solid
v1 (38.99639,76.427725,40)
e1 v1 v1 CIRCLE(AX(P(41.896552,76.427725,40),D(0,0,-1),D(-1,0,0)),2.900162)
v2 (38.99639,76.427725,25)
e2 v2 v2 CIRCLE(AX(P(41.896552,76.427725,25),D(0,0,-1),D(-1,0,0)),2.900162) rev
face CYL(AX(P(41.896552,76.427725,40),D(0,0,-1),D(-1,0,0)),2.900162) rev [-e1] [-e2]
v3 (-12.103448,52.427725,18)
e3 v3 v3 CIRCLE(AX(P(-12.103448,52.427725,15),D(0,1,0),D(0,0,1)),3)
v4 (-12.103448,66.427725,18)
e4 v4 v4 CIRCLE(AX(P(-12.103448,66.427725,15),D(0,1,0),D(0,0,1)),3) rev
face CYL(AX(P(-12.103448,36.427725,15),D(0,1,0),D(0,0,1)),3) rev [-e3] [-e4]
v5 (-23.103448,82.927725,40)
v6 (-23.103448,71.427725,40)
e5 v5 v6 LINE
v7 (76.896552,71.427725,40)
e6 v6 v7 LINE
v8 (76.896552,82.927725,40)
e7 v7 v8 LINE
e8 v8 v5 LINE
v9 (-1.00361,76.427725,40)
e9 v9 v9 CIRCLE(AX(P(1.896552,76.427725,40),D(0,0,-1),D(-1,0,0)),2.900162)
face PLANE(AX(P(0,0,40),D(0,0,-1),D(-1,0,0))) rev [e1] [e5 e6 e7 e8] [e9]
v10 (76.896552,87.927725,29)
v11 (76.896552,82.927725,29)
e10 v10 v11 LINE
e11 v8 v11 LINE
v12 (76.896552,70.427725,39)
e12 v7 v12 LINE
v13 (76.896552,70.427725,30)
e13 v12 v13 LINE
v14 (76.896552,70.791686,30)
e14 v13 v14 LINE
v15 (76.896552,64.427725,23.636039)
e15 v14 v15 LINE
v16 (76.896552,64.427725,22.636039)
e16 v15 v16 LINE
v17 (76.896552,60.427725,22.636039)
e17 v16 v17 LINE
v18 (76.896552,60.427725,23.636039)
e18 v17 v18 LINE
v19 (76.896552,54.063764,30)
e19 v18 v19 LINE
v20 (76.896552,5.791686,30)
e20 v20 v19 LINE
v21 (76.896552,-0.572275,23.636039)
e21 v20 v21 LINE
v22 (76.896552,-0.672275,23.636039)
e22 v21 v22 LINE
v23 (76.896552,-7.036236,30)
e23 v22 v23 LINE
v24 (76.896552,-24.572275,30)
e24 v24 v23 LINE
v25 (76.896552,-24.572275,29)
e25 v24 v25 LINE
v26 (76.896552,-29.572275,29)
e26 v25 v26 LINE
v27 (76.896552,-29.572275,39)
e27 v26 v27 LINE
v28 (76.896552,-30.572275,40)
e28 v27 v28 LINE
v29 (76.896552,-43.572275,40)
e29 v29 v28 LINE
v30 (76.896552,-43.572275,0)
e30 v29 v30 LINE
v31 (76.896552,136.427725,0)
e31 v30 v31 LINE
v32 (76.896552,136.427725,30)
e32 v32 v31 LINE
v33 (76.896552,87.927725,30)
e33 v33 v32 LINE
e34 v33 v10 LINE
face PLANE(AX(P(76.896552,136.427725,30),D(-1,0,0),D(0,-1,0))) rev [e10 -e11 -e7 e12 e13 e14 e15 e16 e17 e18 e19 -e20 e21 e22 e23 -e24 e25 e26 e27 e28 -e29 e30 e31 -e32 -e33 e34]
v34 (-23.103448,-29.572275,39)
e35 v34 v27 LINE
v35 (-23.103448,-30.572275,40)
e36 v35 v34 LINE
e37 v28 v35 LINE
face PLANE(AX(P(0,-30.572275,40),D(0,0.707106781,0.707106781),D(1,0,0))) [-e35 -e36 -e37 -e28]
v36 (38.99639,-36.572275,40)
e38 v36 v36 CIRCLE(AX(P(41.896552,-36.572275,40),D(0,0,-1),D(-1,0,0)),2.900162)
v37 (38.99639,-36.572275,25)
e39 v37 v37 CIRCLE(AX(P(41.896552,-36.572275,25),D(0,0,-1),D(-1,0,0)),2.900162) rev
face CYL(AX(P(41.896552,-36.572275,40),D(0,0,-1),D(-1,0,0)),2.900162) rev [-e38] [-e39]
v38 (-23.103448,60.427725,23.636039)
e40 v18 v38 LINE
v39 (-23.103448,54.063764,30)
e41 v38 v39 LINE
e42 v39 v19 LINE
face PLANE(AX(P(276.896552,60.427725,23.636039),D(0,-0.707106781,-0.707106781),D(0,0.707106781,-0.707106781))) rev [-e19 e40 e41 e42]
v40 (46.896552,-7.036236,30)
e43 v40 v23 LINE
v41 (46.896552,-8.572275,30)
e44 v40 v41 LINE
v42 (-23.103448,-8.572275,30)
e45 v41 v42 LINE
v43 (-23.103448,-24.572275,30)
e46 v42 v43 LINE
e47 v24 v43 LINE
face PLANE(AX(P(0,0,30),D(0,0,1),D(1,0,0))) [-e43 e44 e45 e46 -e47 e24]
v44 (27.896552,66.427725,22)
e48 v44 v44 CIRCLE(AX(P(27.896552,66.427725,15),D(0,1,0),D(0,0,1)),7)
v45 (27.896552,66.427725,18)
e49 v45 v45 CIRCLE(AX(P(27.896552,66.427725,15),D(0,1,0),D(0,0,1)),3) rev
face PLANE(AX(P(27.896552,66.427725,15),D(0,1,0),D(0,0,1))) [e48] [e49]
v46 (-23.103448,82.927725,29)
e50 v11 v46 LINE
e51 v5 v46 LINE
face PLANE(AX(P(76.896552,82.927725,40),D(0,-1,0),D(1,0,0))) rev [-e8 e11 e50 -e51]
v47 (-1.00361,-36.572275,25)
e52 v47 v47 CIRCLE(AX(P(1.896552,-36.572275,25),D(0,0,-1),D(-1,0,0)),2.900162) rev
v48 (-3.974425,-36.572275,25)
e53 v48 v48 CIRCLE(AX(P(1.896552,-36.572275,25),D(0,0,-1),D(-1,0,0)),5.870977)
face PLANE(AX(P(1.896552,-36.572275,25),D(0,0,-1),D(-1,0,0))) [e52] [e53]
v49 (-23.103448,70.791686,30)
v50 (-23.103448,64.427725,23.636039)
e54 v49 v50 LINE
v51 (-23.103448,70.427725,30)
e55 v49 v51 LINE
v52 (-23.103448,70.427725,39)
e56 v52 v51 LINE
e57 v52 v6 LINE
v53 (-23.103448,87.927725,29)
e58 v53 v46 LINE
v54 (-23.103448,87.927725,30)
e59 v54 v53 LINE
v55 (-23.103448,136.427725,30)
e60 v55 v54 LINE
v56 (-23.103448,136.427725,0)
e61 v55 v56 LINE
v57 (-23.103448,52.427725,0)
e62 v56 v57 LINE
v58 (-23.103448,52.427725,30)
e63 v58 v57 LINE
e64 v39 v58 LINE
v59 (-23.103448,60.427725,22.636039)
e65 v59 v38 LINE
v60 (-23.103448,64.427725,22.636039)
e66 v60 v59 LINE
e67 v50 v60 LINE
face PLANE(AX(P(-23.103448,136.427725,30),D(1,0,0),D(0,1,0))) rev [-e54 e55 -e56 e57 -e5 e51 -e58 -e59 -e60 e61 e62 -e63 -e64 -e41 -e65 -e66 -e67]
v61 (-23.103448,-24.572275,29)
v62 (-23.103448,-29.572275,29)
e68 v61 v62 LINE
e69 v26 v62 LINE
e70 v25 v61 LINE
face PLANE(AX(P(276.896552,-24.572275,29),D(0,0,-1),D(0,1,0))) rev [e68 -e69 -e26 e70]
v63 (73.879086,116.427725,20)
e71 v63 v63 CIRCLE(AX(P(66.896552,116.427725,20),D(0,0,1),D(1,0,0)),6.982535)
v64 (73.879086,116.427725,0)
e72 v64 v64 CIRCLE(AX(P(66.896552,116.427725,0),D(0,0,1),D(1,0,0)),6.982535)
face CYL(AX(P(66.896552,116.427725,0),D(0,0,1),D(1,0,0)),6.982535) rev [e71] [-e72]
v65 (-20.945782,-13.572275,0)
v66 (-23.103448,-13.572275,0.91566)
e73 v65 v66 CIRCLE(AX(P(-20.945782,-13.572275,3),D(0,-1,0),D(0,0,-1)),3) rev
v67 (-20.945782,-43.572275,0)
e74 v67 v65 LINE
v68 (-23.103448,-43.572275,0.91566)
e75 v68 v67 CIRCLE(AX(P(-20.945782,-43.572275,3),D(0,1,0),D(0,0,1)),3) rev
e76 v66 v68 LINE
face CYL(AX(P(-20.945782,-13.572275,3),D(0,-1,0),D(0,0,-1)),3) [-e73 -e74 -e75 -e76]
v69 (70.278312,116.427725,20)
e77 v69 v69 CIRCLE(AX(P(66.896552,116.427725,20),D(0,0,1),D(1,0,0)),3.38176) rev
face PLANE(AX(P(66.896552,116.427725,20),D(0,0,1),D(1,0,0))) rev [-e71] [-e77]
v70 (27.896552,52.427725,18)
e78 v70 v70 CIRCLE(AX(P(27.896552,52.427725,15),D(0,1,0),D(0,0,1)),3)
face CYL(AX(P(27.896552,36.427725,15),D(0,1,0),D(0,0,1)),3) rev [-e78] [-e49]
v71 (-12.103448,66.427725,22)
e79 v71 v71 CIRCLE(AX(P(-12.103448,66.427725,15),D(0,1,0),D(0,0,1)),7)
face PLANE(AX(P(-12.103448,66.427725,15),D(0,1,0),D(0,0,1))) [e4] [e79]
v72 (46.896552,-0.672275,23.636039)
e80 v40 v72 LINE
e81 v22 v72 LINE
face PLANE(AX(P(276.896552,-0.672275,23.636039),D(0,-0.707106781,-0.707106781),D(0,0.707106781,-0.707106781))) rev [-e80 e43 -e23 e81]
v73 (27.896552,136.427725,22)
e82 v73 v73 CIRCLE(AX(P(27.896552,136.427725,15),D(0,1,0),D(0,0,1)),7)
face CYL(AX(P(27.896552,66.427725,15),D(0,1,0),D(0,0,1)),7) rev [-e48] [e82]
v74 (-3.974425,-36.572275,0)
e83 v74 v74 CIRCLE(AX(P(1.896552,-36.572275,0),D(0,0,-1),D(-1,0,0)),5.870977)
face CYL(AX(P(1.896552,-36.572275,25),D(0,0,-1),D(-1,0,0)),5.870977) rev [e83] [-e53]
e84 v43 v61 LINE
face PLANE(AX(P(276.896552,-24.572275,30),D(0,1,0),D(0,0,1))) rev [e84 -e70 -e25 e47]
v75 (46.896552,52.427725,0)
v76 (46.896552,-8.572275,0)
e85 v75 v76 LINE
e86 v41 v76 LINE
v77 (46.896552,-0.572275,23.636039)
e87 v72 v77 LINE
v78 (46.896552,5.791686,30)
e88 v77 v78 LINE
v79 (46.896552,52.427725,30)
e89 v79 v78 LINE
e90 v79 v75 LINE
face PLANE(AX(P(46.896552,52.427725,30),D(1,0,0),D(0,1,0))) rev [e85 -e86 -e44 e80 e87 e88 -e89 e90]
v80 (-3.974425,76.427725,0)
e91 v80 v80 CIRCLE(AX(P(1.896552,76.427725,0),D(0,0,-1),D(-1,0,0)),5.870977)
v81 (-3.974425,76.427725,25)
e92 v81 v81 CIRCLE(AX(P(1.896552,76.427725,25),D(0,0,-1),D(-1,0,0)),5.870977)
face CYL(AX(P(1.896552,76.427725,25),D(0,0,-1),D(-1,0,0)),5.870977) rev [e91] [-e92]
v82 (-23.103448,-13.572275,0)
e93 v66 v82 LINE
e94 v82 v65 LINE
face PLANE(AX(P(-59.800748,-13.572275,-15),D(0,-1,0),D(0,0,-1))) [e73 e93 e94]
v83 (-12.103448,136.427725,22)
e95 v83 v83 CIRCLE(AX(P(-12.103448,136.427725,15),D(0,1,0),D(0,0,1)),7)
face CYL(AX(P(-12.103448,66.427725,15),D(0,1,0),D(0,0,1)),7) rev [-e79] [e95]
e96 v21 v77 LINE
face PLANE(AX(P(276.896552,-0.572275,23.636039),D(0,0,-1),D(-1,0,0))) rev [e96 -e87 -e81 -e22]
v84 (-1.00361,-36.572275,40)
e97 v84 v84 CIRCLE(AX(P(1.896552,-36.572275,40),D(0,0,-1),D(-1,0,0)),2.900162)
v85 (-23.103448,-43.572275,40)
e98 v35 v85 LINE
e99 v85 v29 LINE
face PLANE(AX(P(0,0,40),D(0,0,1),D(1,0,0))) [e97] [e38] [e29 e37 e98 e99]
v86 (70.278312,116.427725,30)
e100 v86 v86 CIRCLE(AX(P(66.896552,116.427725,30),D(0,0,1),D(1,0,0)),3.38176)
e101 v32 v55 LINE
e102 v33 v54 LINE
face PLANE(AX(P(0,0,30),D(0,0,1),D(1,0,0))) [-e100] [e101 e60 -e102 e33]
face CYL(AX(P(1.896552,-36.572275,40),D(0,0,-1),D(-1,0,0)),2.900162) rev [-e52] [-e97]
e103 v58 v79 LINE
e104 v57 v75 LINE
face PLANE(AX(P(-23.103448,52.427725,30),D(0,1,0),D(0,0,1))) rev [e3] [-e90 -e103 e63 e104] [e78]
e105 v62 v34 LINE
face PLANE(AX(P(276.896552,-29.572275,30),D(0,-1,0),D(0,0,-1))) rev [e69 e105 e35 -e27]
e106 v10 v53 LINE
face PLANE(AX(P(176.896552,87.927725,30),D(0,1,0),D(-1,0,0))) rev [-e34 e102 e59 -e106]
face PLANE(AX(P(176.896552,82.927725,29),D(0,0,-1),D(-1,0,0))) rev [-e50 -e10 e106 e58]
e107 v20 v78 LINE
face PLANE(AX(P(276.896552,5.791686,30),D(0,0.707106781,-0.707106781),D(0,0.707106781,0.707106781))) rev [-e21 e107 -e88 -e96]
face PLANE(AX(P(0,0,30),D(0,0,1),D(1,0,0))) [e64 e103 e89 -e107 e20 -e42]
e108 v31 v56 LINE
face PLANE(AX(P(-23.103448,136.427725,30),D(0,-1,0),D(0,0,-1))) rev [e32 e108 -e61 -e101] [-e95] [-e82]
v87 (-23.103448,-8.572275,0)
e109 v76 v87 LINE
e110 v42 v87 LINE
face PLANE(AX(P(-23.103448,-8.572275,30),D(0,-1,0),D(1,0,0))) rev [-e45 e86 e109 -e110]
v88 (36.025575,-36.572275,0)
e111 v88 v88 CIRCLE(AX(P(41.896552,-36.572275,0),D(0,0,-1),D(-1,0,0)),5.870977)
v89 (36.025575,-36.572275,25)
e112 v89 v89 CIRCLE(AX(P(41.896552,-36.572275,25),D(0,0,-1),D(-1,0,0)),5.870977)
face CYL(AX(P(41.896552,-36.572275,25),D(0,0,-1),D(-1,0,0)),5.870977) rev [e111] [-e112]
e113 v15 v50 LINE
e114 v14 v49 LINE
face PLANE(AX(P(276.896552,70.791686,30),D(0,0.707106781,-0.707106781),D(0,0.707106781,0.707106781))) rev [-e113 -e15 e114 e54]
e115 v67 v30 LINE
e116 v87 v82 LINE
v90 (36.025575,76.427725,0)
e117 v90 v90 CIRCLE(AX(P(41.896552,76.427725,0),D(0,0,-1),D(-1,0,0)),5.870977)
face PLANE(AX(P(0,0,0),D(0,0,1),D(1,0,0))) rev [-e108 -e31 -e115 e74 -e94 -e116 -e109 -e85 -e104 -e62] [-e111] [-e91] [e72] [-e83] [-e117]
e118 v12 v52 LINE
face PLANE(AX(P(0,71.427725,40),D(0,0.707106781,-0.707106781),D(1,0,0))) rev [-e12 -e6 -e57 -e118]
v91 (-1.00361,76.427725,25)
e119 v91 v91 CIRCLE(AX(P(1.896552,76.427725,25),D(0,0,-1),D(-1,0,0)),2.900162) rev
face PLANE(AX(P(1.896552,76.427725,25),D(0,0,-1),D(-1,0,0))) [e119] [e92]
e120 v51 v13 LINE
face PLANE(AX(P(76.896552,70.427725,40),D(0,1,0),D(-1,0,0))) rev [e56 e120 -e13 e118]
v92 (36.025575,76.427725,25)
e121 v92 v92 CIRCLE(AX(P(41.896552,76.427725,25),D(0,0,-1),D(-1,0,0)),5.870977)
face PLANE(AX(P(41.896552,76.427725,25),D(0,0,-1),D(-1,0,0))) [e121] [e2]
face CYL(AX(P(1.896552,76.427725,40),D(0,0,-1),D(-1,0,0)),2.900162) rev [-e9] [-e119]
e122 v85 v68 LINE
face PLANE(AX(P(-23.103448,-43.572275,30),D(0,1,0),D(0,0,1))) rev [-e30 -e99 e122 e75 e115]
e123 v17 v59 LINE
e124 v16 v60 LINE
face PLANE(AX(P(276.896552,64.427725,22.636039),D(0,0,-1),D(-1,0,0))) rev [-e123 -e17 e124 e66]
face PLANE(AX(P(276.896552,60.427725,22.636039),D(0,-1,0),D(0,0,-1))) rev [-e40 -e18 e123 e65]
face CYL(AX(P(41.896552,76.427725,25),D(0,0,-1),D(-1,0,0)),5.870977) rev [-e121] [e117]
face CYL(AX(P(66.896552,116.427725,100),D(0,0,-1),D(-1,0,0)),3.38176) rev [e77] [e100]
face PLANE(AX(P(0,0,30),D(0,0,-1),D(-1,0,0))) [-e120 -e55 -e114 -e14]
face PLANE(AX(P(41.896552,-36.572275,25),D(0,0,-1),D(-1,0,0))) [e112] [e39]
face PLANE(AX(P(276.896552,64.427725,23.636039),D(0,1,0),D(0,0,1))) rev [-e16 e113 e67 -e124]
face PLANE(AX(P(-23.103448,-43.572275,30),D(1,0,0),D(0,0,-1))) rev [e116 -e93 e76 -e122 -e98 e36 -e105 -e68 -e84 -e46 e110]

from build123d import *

# Parameters (mm, degrees)
BOSS_EXTRUDE1_DEPTH         = 30
SKETCH2_W                   = 1
SKETCH2_H                   = 5
CUT_EXTRUDE1_DEPTH          = 300
SKETCH11_W                  = 100
SKETCH11_H                  = 14
SKETCH11_H_2                = 12.5
BOSS_EXTRUDE2_DEPTH         = 10
SKETCH3_R                   = 3
CUT_EXTRUDE2_DEPTH          = 100
SKETCH4_R                   = 7
CUT_EXTRUDE3_DEPTH          = 70
LPATTERN1_COUNT             = 2
LPATTERN1_PITCH             = 40
SKETCH9_R                   = 3.381759822
CUT_EXTRUDE8_DEPTH          = 100
CUT_EXTRUDE9_START          = -10
SKETCH10_R                  = 6.982534733
CUT_EXTRUDE9_DEPTH          = 20
LPATTERN4_COUNT             = 2
LPATTERN4_PITCH             = 140
SKETCH7_R                   = 2.900161541
CUT_EXTRUDE6_DEPTH          = 40
SKETCH8_R                   = 5.870976625
CUT_EXTRUDE7_DEPTH          = 25
PATTERN_LINEAR_1_COUNT      = 2
PATTERN_LINEAR_1_PITCH      = 40
PATTERN_LINEAR_1_COUNT_DIR2 = 2
PATTERN_LINEAR_1_PITCH_DIR2 = 113
SKETCH_1_W                  = 1
SKETCH_1_H                  = 5
CUT_EXTRUDE_1_DEPTH         = 200
CHAMFER_1_SIZE              = 1
SKETCH_3_R                  = 40
CUT_EXTRUDE_3_DEPTH         = 30
FILLET_1_R                  = 3


with BuildPart() as part:
    # Sketch1 → Boss-Extrude1 (new body)
    with BuildSketch(Plane.XY):
        Polygon((-23.103448276, -43.572275418), (-23.103448276, -8.572275418), (46.896551724, -8.572275418), (46.896551724, 52.427724582), (-23.103448276, 52.427724582), (-23.103448276, 136.427724582), (76.896551724, 136.427724582), (76.896551724, -43.572275418), align=None)
    extrude(amount=BOSS_EXTRUDE1_DEPTH)

    # Sketch2 → Cut-Extrude1 (cut)
    with BuildSketch(Plane.ZY.offset(23.103448276)):
        Polygon((30, 5.791685612), (23.636038969, -0.572275418), (23.636038969, -0.672275418), (30, -7.036236449), align=None)
        Polygon((30, 70.791685612), (23.636038969, 64.427724582), (22.636038969, 64.427724582), (22.636038969, 60.427724582), (23.636038969, 60.427724582), (30, 54.063763551), align=None)
        with Locations((29.5, -27.072275418)):
            Rectangle(SKETCH2_W, SKETCH2_H)
    extrude(amount=-CUT_EXTRUDE1_DEPTH, mode=Mode.SUBTRACT)

    # Sketch11 → Boss-Extrude2 (add)
    with BuildSketch(Plane.XY.offset(30)):
        with Locations((26.896551724, -36.572275418)):
            Rectangle(SKETCH11_W, SKETCH11_H)
        with Locations((26.896551724, 76.677724582)):
            Rectangle(SKETCH11_W, SKETCH11_H_2)
    extrude(amount=BOSS_EXTRUDE2_DEPTH)

    # Sketch3 → Cut-Extrude2 (cut)
    with BuildSketch(Plane(origin=(0, 136.427724582, 0), x_dir=(1, 0, 0), z_dir=(0, 1, 0))):
        with Locations(Location((-12.103448276, -15, 0), (0, 0, 270))):
            Circle(SKETCH3_R)
    cut_extrude2 = extrude(amount=-CUT_EXTRUDE2_DEPTH, mode=Mode.SUBTRACT)

    # Sketch4 → Cut-Extrude3 (cut)
    with BuildSketch(Plane(origin=(0, 136.427724582, 0), x_dir=(1, 0, 0), z_dir=(0, 1, 0))):
        with Locations(Location((-12.103448276, -15, 0), (0, 0, 270))):
            Circle(SKETCH4_R)
    cut_extrude3 = extrude(amount=-CUT_EXTRUDE3_DEPTH, mode=Mode.SUBTRACT)

    # LPattern1: Cut-Extrude2, Cut-Extrude3 ×2
    with Locations(*[(i * LPATTERN1_PITCH, 0, 0) for i in range(1, LPATTERN1_COUNT)]):
        add(cut_extrude2, mode=Mode.SUBTRACT)
        add(cut_extrude3, mode=Mode.SUBTRACT)

    # Sketch9 → Cut-Extrude8 (cut)
    with BuildSketch(Plane(origin=(0, 0, 0), x_dir=(-1, 0, 0), z_dir=(0, 0, -1))):
        with Locations((-66.896551724, 116.427724582)):
            Circle(SKETCH9_R)
    cut_extrude8 = extrude(amount=-CUT_EXTRUDE8_DEPTH, mode=Mode.SUBTRACT)

    # Sketch10 → Cut-Extrude9 (cut)
    with BuildSketch(Plane.XY.offset(30).offset(CUT_EXTRUDE9_START)):
        with Locations((66.896551724, 116.427724582)):
            Circle(SKETCH10_R)
    cut_extrude9 = extrude(amount=-CUT_EXTRUDE9_DEPTH, mode=Mode.SUBTRACT)

    # LPattern4: Cut-Extrude8, Cut-Extrude9 ×2
    with Locations(*[(-i * LPATTERN4_PITCH, 0, 0) for i in range(1, LPATTERN4_COUNT)]):
        add(cut_extrude8, mode=Mode.SUBTRACT)
        add(cut_extrude9, mode=Mode.SUBTRACT)

    # Sketch7 → Cut-Extrude6 (cut)
    with BuildSketch(Plane(origin=(0, 0, 0), x_dir=(-1, 0, 0), z_dir=(0, 0, -1))):
        with Locations((-1.896551724, -36.572275418)):
            Circle(SKETCH7_R)
    cut_extrude6 = extrude(amount=-CUT_EXTRUDE6_DEPTH, mode=Mode.SUBTRACT)

    # Sketch8 → Cut-Extrude7 (cut)
    with BuildSketch(Plane(origin=(0, 0, 0), x_dir=(-1, 0, 0), z_dir=(0, 0, -1))):
        with Locations((-1.896551724, -36.572275418)):
            Circle(SKETCH8_R)
    cut_extrude7 = extrude(amount=-CUT_EXTRUDE7_DEPTH, mode=Mode.SUBTRACT)

    # Линейный массив1: Cut-Extrude6, Cut-Extrude7 2 × 2
    with Locations(*[(i * PATTERN_LINEAR_1_PITCH, j * PATTERN_LINEAR_1_PITCH_DIR2, 0) for i in range(PATTERN_LINEAR_1_COUNT) for j in range(PATTERN_LINEAR_1_COUNT_DIR2) if (i, j) != (0, 0)]):
        add(cut_extrude6, mode=Mode.SUBTRACT)
        add(cut_extrude7, mode=Mode.SUBTRACT)

    # Эскиз1 → Вырез-Вытянуть1 (cut)
    with BuildSketch(Plane.ZY.offset(23.103448276)):
        with Locations((29.5, 85.427724582)):
            Rectangle(SKETCH_1_W, SKETCH_1_H)
    extrude(amount=-CUT_EXTRUDE_1_DEPTH, mode=Mode.SUBTRACT)

    # Фаска1
    chamfer_1_edges = [part.edges().sort_by_distance(p)[0] for p in [
        (26.896551724, 70.427724582, 40),
        (26.896551724, -29.572275418, 40),
    ]]
    chamfer(chamfer_1_edges, length=CHAMFER_1_SIZE)

    # Эскиз3 → Вырез-Вытянуть3 (cut)
    with BuildSketch(Plane.XZ.offset(43.572275418)):
        with Locations((-59.800747668, -15)):
            Circle(SKETCH_3_R)
    extrude(amount=-CUT_EXTRUDE_3_DEPTH, mode=Mode.SUBTRACT)

    # Скругление1
    # the kernel refuses this fillet: 3 mm, written as the material it takes off along each edge
    with BuildSketch(Plane(origin=(-22.719755232, -13.572275418, 0), x_dir=(-0.3864755051047792, 0, 0.9222996714484971), z_dir=(0, -1, 0))) as fillet_1_piece_1:
        with BuildLine():
            CenterArc((2.081301731, -2.795561642), FILLET_1_R, 111.274329899, 45.990298087)
            Line((-0.685597284, -1.636135127), (-0.740935264, -1.612946597))
            Line((-0.740935264, -1.612946597), (-0.05533798, 0.02318853))
            Line((-0.05533798, 0.02318853), (0.0007446, 0.05999538))
            ThreePointArc((0.0007446, 0.05999538), (0.49640021, 0.056919717), (0.971030393, 0.055911233))
            Line((0.971030393, 0.055911233), (0.992800419, 0))
        make_face()
    extrude(amount=34.434933616, mode=Mode.SUBTRACT)


solid = part.part
